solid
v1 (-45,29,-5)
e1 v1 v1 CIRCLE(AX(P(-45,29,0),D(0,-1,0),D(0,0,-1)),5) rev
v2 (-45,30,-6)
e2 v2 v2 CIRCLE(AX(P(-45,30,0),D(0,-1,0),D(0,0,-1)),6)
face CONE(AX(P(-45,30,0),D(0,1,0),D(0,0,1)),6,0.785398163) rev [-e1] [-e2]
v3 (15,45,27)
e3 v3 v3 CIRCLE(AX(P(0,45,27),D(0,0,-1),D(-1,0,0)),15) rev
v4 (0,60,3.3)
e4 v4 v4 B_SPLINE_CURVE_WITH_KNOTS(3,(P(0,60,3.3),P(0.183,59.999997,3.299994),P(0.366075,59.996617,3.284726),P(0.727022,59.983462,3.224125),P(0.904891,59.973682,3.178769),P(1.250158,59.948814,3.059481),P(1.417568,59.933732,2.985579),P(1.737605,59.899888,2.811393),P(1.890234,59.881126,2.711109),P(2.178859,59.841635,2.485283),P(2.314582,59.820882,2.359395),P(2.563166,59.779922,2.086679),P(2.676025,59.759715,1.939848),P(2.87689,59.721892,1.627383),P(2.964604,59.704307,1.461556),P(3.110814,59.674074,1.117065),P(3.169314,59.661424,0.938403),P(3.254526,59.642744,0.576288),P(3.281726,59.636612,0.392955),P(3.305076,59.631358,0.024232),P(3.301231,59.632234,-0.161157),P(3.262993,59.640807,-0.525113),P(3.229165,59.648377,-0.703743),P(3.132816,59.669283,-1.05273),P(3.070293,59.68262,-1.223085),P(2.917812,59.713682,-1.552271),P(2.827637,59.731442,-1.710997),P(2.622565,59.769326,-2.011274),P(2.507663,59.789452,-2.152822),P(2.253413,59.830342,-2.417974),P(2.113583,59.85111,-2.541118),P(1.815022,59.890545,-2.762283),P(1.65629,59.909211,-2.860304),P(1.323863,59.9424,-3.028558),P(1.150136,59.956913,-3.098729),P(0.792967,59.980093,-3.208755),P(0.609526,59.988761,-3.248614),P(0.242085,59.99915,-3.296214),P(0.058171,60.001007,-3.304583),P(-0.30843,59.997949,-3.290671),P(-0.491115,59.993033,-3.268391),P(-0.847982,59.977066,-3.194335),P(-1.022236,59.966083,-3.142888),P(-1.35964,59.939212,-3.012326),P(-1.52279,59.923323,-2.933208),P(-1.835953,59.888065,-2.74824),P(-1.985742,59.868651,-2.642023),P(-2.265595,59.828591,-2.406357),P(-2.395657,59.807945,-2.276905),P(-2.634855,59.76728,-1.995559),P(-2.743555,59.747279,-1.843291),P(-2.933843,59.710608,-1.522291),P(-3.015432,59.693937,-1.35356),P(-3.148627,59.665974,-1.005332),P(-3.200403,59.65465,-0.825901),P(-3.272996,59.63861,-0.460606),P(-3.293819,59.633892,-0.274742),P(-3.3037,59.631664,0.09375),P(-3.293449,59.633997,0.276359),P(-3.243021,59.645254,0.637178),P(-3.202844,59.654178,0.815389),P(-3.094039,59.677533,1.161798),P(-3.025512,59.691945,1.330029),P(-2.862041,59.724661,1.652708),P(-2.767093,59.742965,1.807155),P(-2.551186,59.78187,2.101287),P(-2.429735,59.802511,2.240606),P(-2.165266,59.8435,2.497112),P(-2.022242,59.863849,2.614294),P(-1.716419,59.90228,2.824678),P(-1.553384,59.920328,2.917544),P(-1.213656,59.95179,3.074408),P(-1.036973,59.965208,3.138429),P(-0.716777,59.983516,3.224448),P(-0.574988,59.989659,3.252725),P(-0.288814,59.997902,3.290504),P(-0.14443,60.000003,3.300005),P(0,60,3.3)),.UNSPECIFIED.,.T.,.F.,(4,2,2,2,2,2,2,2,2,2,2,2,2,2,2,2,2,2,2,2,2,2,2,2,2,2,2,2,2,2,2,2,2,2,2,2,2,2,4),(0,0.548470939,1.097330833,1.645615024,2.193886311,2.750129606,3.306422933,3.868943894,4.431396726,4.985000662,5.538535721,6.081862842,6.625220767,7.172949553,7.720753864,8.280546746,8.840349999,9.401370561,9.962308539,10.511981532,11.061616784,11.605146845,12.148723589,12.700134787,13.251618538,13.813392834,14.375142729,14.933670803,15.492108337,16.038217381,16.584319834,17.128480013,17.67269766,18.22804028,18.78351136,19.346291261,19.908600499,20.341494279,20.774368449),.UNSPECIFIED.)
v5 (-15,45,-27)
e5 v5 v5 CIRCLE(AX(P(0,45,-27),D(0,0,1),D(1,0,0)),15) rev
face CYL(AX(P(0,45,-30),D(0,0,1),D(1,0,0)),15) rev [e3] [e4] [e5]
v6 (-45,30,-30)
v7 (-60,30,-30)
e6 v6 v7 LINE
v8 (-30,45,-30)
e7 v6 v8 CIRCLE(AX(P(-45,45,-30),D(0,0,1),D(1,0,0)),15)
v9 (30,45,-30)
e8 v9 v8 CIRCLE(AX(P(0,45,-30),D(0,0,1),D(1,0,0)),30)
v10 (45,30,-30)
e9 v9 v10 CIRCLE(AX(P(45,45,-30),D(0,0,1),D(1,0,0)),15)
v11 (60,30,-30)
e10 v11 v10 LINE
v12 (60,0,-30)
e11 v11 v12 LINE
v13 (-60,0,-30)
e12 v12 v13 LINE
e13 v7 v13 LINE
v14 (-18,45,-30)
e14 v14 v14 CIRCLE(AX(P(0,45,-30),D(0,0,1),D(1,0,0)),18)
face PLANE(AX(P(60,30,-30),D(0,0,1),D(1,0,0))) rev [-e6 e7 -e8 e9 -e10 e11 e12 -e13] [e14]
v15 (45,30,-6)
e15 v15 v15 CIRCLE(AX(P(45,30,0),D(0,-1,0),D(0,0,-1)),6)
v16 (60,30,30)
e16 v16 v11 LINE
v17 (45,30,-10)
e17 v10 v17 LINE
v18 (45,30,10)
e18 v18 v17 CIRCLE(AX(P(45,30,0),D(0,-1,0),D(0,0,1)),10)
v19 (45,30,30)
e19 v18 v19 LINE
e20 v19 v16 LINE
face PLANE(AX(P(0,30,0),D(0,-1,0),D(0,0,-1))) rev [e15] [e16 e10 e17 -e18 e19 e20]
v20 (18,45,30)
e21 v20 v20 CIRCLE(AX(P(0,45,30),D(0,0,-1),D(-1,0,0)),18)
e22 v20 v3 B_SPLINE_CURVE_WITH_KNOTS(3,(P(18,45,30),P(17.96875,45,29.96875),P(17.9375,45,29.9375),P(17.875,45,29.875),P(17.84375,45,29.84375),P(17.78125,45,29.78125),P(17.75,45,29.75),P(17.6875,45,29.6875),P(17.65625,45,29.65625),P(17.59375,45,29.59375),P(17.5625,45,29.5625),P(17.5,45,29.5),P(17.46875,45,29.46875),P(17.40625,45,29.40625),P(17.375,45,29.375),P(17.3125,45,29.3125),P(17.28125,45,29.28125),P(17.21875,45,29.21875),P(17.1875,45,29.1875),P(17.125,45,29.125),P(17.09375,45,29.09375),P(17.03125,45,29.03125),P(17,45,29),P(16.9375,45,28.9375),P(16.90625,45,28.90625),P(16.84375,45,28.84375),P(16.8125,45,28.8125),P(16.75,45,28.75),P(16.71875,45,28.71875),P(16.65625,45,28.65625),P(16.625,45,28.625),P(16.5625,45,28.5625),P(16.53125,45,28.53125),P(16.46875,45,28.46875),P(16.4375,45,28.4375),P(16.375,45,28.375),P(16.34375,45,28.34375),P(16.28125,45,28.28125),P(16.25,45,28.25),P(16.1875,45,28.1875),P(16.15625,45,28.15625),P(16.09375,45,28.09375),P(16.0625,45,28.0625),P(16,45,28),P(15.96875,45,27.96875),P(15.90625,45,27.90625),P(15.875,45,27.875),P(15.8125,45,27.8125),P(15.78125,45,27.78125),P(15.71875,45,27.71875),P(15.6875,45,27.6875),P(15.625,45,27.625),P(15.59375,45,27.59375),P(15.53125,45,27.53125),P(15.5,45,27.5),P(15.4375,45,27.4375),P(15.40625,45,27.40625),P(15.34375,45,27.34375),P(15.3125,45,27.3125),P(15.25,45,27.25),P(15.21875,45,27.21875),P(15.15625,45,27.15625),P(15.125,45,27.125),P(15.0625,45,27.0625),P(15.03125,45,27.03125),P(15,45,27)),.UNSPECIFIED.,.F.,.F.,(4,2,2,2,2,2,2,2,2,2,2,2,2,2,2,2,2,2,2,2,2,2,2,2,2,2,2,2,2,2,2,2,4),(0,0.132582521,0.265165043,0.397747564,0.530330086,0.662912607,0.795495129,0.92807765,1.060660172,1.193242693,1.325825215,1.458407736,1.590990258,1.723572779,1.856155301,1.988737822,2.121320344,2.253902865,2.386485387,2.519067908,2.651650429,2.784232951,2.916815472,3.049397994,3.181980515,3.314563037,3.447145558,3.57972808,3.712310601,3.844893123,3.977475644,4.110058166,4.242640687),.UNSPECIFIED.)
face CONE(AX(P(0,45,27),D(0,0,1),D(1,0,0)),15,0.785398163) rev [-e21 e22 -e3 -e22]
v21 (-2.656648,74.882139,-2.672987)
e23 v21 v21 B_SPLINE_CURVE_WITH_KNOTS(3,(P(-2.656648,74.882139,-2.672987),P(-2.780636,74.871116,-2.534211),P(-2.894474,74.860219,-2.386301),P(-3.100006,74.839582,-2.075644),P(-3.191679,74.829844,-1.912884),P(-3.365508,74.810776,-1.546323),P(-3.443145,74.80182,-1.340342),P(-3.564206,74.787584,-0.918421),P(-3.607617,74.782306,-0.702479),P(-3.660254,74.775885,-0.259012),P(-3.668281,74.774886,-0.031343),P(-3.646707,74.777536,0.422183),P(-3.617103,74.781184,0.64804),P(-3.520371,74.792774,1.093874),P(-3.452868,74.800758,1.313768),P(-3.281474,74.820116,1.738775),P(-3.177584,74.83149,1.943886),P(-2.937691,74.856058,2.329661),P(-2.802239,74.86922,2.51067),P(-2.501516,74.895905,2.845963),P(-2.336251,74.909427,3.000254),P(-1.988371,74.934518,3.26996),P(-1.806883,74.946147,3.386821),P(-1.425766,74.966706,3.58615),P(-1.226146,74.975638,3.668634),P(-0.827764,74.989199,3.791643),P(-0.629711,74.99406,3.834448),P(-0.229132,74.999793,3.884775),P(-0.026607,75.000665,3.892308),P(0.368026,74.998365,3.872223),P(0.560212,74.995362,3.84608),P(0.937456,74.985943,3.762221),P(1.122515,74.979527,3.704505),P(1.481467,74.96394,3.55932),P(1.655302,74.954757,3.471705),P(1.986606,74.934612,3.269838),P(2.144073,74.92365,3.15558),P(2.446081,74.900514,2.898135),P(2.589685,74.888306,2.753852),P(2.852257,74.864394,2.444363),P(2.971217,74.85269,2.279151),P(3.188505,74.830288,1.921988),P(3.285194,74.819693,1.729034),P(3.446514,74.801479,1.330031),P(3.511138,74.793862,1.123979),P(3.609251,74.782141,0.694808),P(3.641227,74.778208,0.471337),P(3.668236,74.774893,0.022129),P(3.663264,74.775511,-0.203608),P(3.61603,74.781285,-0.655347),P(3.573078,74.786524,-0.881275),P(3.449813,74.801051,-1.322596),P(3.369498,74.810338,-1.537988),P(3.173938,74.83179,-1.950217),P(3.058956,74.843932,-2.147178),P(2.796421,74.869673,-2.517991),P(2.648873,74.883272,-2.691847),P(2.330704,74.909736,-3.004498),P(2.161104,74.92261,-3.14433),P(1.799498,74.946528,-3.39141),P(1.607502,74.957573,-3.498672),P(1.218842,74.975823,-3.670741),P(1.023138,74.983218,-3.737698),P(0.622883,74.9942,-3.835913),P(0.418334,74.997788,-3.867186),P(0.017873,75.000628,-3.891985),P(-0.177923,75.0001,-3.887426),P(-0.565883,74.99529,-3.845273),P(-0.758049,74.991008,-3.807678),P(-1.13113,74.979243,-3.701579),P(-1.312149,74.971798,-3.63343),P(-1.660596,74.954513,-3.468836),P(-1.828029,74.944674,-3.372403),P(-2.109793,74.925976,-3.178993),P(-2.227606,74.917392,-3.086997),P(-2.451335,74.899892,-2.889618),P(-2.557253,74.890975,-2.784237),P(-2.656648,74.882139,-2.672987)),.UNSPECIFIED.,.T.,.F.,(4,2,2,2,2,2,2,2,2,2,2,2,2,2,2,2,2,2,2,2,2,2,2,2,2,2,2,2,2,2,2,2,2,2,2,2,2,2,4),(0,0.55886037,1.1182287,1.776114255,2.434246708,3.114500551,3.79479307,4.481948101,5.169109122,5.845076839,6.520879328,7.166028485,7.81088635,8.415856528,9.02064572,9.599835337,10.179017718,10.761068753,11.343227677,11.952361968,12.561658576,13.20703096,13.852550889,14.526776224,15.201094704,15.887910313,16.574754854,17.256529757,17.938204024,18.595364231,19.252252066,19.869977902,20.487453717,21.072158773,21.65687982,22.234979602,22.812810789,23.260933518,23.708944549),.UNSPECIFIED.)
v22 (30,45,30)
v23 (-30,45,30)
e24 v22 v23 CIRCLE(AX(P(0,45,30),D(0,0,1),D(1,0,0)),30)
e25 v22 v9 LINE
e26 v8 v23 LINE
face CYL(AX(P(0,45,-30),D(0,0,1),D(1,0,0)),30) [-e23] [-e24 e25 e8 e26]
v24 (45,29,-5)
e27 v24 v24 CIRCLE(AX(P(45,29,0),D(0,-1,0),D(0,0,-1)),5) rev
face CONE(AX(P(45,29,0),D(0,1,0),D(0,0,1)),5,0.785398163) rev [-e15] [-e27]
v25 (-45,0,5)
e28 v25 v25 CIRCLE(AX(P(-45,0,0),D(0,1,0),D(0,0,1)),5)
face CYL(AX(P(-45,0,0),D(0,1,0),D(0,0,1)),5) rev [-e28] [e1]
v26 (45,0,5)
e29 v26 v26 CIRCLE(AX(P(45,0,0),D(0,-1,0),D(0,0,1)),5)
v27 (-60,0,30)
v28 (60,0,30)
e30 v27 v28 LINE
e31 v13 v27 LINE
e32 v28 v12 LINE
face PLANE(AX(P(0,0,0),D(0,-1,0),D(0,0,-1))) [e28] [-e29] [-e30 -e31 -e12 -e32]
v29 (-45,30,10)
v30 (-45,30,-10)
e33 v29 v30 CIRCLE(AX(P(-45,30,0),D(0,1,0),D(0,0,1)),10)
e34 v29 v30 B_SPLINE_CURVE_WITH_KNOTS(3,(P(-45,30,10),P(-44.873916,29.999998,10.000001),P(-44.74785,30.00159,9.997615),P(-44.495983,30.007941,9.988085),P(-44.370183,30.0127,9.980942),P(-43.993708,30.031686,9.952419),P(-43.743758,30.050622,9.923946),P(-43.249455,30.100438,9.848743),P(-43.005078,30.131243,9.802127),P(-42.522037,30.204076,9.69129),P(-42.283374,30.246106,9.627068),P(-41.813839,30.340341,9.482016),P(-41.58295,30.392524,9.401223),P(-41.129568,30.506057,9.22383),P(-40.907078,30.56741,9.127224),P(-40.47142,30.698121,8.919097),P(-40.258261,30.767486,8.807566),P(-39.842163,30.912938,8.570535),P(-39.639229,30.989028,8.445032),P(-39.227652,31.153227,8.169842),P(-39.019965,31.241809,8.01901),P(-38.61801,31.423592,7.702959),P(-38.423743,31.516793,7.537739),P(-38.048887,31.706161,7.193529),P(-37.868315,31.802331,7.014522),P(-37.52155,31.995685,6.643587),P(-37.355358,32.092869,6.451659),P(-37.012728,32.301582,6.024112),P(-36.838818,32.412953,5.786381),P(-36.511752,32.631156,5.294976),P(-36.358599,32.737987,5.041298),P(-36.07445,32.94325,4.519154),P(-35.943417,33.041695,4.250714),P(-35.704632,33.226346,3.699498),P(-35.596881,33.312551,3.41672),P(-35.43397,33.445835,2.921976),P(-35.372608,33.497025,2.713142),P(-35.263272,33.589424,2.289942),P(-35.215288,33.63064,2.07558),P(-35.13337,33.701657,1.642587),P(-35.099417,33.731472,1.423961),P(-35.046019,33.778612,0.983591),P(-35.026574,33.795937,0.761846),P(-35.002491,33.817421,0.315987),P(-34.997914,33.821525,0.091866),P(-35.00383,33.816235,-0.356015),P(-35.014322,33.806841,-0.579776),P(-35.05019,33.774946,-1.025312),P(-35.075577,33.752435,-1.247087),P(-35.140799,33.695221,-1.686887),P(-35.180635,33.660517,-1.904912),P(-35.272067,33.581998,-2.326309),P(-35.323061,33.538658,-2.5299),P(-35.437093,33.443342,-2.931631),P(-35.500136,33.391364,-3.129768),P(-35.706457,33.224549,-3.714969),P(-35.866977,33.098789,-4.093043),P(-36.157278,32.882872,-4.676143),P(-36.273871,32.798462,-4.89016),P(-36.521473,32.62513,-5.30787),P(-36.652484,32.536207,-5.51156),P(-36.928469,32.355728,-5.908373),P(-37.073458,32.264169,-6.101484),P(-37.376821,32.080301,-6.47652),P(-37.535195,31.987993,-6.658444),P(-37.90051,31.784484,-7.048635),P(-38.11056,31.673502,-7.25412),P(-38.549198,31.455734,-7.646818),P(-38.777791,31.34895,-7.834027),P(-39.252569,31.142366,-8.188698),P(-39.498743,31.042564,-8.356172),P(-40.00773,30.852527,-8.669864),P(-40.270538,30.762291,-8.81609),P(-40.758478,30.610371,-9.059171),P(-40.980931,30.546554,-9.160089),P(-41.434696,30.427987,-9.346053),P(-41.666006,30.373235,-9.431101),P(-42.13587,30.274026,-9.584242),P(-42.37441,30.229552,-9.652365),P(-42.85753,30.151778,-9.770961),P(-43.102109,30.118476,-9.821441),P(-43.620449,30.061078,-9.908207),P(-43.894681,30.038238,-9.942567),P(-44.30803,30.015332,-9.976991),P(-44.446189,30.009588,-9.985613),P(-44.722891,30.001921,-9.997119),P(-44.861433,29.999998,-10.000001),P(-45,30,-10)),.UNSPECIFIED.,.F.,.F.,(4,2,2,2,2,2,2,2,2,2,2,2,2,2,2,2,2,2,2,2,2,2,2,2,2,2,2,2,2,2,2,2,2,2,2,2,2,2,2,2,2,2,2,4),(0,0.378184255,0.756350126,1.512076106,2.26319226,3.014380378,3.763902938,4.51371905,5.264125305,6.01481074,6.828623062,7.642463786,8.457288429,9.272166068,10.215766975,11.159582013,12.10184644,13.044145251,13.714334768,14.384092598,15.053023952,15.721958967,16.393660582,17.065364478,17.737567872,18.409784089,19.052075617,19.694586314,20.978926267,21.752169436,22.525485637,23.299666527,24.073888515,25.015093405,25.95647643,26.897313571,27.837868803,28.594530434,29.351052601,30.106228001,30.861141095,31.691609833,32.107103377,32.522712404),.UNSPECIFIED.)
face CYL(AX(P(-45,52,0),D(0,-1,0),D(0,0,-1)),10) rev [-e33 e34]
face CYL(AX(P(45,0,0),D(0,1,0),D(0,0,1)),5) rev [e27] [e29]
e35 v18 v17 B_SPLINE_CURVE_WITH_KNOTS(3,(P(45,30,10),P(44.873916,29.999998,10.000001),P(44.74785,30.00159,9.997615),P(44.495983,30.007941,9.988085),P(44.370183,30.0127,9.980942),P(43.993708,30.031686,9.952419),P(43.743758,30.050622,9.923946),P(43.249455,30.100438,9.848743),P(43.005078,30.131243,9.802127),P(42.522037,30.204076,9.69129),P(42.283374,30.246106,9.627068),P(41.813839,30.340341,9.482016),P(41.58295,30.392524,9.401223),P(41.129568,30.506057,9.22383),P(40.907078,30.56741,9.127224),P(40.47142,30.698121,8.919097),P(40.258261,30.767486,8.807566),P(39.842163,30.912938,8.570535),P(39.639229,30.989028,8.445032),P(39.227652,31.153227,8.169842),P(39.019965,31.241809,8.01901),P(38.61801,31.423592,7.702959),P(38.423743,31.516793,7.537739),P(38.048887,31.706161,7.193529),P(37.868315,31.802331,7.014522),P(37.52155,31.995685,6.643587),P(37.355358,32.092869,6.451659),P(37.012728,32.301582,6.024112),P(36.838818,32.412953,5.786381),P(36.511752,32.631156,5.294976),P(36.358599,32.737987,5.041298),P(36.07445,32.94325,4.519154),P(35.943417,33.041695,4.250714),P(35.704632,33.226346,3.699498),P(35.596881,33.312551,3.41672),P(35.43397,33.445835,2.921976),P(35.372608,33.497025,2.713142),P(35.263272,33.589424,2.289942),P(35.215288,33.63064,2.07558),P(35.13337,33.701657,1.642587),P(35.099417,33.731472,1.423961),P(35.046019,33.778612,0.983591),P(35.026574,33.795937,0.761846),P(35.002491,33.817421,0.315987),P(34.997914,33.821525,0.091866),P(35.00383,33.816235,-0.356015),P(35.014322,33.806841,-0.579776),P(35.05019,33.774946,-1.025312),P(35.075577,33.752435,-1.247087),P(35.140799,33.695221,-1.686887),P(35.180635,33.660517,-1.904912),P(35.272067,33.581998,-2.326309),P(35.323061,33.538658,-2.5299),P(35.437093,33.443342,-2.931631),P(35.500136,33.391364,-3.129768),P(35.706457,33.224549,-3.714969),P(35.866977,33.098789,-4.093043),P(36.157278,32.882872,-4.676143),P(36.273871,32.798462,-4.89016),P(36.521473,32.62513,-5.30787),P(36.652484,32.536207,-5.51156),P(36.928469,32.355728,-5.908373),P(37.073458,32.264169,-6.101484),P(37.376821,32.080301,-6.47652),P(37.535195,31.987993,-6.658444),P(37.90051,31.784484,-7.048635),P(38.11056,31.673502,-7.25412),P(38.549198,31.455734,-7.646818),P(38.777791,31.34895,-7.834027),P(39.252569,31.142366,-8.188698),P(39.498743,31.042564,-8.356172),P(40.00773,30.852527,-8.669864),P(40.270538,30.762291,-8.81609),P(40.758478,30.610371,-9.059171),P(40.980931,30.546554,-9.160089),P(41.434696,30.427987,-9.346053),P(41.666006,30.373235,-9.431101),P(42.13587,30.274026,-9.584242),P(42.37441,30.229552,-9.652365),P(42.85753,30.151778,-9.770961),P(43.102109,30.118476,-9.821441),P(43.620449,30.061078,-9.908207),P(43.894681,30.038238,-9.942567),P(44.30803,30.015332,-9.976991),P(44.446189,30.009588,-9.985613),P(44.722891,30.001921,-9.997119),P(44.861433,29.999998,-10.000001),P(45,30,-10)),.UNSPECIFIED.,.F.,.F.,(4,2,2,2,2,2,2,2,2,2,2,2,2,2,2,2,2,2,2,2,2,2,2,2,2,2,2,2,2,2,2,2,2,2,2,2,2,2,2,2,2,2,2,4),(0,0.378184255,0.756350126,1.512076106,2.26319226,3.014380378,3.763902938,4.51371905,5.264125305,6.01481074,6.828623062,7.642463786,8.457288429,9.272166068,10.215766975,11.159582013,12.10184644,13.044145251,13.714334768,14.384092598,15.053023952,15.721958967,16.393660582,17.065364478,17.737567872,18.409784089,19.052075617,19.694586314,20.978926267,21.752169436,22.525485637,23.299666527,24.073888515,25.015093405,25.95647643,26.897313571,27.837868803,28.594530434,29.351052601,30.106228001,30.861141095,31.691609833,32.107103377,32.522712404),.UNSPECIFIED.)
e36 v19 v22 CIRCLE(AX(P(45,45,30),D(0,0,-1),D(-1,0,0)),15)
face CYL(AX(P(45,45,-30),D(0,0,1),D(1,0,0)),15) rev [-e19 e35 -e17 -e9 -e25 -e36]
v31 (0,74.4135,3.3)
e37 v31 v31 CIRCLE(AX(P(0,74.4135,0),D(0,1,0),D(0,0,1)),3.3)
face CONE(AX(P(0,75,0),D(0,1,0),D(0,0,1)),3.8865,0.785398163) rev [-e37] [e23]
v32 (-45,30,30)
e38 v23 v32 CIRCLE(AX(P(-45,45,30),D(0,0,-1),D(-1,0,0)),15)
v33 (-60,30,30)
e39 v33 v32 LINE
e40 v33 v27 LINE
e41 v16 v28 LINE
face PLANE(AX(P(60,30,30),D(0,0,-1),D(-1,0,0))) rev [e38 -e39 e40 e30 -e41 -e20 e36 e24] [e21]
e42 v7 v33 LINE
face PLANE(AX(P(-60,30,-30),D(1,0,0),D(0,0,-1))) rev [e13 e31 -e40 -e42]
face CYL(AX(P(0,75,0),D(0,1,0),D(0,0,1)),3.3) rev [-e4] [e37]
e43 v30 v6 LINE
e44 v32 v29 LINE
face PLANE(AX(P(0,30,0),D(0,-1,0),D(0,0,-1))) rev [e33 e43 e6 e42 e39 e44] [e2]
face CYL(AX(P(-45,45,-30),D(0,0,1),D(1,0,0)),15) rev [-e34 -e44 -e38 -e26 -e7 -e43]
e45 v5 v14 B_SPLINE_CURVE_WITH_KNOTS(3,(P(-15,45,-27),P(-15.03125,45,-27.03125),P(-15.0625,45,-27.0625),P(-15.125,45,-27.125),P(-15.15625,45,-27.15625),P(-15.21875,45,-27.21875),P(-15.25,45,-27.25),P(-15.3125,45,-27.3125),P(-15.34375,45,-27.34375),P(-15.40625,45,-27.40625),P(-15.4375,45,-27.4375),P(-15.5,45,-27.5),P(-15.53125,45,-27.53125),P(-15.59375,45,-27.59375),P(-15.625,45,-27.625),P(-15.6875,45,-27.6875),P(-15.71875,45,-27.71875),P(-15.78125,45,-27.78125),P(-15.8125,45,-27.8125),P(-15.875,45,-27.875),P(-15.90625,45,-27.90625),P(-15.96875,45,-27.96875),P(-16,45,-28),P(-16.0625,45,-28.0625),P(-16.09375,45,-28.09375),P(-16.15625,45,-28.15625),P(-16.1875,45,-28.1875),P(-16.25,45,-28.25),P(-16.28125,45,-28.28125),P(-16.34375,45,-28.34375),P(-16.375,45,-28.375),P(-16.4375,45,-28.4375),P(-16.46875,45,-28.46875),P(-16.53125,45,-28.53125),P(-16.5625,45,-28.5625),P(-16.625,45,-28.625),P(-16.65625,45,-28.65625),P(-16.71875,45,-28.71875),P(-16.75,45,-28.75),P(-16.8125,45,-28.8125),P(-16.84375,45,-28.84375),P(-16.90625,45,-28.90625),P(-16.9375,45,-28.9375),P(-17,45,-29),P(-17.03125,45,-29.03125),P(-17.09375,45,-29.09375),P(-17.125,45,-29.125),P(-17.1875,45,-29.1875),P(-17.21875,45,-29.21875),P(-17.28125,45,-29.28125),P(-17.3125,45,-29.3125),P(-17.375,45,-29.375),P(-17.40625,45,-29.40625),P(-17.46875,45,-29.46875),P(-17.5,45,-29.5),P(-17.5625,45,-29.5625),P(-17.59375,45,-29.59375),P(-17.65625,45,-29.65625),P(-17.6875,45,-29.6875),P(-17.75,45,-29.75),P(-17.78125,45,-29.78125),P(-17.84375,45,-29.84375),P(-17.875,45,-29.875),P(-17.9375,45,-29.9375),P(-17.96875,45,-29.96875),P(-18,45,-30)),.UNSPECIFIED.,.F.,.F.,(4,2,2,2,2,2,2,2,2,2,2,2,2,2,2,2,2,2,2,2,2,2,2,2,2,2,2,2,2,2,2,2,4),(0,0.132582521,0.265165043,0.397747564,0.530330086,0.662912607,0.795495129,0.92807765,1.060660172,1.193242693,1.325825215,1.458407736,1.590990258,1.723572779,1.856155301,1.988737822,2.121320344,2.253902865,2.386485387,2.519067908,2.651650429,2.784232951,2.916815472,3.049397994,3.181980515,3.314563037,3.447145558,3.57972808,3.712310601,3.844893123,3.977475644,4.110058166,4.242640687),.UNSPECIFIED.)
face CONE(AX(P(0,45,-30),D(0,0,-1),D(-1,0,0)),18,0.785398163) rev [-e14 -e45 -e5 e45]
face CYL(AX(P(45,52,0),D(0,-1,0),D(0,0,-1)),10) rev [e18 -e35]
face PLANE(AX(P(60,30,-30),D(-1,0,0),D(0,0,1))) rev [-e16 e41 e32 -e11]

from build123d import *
from build123d.topology import SkipClean

# Parameters (mm, degrees)
SKETCH1_W                      = 120
SKETCH1_H                      = 60
BOSS_EXTRUDE1_DEPTH            = 30
SKETCH2_R                      = 30
BOSS_EXTRUDE2_DEPTH            = 60
FILLET1_R                      = 15
SKETCH3_R                      = 5
CUT_EXTRUDE2_DEPTH             = 81.777472107
SKETCH4_R                      = 10
CUT_EXTRUDE3_DEPTH             = 22
CHAMFER1_SIZE                  = 1
SKETCH5_R                      = 15
CUT_EXTRUDE4_DEPTH             = 114.247516582
CHAMFER3_SIZE                  = 3
G1_16_TAPPED_HOLE2_D           = 6.6
G1_16_TAPPED_HOLE2_DEPTH       = 29.999
G1_16_TAPPED_HOLE2_CSINK_D     = 7.773
G1_16_TAPPED_HOLE2_CSINK_ANGLE = 90
G1_16_TAPPED_HOLE2_TIP         = 1.982840043


# Read off the part's stored shape, not the designer's step: Mirror1
with BuildPart() as part:
    # Sketch1 → Boss-Extrude1 (new body)
    with BuildSketch(Plane(origin=(0, 0, 0), x_dir=(1, 0, 0), z_dir=(0, 1, 0))):
        Rectangle(SKETCH1_W, SKETCH1_H)
    extrude(amount=BOSS_EXTRUDE1_DEPTH)

    # Sketch2 → Boss-Extrude2 (add)
    with BuildSketch(Plane.XY.offset(30)):
        with Locations((0, 45)):
            Circle(SKETCH2_R)
    extrude(amount=-BOSS_EXTRUDE2_DEPTH)

    # Fillet1
    fillet1_edges = [part.edges().sort_by_distance(p)[0] for p in [
        (-25.980762114, 30, 0),
    ]]
    fillet(fillet1_edges, radius=FILLET1_R)

    # Sketch3 → Cut-Extrude2 (cut, symmetric)
    with BuildSketch(Plane(origin=(0, 30, 0), x_dir=(1, 0, 0), z_dir=(0, 1, 0))):
        with Locations(Location((-45, 0, 0), (0, 0, 270))):
            Circle(SKETCH3_R)
    extrude(amount=CUT_EXTRUDE2_DEPTH, both=True, mode=Mode.SUBTRACT)

    # Sketch4 → Cut-Extrude3 (cut)
    with BuildSketch(Plane(origin=(0, 30, 0), x_dir=(1, 0, 0), z_dir=(0, 1, 0))):
        with Locations((-45, 0)):
            Circle(SKETCH4_R)
    extrude(amount=CUT_EXTRUDE3_DEPTH, mode=Mode.SUBTRACT)

    # Chamfer1
    chamfer1_edges = [part.edges().sort_by_distance(p)[0] for p in [
        (-45, 30, -5),
    ]]
    chamfer(chamfer1_edges, length=CHAMFER1_SIZE)

    # Sketch5 → Cut-Extrude4 (cut, through all)
    with BuildSketch(Plane.XY.offset(30)):
        with Locations((0, 45)):
            Circle(SKETCH5_R)
    extrude(amount=-CUT_EXTRUDE4_DEPTH, mode=Mode.SUBTRACT)

    # Chamfer3
    chamfer3_edges = [part.edges().sort_by_distance(p)[0] for p in [
        (-15, 45, -30),
        (-15, 45, 30),
    ]]
    chamfer(chamfer3_edges, length=CHAMFER3_SIZE)

    # Mirror1
    split(bisect_by=Plane(origin=(0, 0, 0), x_dir=(0, 0, 1), z_dir=(1, 0, 0)), keep=Keep.BOTTOM)

    # Mirror1 2: part across plane


with BuildPart() as part_1:
    with SkipClean():  # the faces are left unmerged after this step: merging them gives an invalid solid
        add(part.part)
        add(part.part.mirror(Plane(origin=(0, 0, 0), x_dir=(0, 0, 1), z_dir=(1, 0, 0))))

    # G1/16 Tapped Hole2
    with Locations(Plane(origin=(0, 75, 0), x_dir=(1, 0, 0), z_dir=(0, 1, 0))):
        with Locations((0, 0)):
            CounterSinkHole(G1_16_TAPPED_HOLE2_D / 2, G1_16_TAPPED_HOLE2_CSINK_D / 2, depth=G1_16_TAPPED_HOLE2_DEPTH, counter_sink_angle=G1_16_TAPPED_HOLE2_CSINK_ANGLE)
            with Locations((0, 0, -(G1_16_TAPPED_HOLE2_DEPTH + G1_16_TAPPED_HOLE2_TIP / 2))):  # 118° drill point
                Cone(0, G1_16_TAPPED_HOLE2_D / 2, G1_16_TAPPED_HOLE2_TIP, mode=Mode.SUBTRACT)


solid = part_1.part
